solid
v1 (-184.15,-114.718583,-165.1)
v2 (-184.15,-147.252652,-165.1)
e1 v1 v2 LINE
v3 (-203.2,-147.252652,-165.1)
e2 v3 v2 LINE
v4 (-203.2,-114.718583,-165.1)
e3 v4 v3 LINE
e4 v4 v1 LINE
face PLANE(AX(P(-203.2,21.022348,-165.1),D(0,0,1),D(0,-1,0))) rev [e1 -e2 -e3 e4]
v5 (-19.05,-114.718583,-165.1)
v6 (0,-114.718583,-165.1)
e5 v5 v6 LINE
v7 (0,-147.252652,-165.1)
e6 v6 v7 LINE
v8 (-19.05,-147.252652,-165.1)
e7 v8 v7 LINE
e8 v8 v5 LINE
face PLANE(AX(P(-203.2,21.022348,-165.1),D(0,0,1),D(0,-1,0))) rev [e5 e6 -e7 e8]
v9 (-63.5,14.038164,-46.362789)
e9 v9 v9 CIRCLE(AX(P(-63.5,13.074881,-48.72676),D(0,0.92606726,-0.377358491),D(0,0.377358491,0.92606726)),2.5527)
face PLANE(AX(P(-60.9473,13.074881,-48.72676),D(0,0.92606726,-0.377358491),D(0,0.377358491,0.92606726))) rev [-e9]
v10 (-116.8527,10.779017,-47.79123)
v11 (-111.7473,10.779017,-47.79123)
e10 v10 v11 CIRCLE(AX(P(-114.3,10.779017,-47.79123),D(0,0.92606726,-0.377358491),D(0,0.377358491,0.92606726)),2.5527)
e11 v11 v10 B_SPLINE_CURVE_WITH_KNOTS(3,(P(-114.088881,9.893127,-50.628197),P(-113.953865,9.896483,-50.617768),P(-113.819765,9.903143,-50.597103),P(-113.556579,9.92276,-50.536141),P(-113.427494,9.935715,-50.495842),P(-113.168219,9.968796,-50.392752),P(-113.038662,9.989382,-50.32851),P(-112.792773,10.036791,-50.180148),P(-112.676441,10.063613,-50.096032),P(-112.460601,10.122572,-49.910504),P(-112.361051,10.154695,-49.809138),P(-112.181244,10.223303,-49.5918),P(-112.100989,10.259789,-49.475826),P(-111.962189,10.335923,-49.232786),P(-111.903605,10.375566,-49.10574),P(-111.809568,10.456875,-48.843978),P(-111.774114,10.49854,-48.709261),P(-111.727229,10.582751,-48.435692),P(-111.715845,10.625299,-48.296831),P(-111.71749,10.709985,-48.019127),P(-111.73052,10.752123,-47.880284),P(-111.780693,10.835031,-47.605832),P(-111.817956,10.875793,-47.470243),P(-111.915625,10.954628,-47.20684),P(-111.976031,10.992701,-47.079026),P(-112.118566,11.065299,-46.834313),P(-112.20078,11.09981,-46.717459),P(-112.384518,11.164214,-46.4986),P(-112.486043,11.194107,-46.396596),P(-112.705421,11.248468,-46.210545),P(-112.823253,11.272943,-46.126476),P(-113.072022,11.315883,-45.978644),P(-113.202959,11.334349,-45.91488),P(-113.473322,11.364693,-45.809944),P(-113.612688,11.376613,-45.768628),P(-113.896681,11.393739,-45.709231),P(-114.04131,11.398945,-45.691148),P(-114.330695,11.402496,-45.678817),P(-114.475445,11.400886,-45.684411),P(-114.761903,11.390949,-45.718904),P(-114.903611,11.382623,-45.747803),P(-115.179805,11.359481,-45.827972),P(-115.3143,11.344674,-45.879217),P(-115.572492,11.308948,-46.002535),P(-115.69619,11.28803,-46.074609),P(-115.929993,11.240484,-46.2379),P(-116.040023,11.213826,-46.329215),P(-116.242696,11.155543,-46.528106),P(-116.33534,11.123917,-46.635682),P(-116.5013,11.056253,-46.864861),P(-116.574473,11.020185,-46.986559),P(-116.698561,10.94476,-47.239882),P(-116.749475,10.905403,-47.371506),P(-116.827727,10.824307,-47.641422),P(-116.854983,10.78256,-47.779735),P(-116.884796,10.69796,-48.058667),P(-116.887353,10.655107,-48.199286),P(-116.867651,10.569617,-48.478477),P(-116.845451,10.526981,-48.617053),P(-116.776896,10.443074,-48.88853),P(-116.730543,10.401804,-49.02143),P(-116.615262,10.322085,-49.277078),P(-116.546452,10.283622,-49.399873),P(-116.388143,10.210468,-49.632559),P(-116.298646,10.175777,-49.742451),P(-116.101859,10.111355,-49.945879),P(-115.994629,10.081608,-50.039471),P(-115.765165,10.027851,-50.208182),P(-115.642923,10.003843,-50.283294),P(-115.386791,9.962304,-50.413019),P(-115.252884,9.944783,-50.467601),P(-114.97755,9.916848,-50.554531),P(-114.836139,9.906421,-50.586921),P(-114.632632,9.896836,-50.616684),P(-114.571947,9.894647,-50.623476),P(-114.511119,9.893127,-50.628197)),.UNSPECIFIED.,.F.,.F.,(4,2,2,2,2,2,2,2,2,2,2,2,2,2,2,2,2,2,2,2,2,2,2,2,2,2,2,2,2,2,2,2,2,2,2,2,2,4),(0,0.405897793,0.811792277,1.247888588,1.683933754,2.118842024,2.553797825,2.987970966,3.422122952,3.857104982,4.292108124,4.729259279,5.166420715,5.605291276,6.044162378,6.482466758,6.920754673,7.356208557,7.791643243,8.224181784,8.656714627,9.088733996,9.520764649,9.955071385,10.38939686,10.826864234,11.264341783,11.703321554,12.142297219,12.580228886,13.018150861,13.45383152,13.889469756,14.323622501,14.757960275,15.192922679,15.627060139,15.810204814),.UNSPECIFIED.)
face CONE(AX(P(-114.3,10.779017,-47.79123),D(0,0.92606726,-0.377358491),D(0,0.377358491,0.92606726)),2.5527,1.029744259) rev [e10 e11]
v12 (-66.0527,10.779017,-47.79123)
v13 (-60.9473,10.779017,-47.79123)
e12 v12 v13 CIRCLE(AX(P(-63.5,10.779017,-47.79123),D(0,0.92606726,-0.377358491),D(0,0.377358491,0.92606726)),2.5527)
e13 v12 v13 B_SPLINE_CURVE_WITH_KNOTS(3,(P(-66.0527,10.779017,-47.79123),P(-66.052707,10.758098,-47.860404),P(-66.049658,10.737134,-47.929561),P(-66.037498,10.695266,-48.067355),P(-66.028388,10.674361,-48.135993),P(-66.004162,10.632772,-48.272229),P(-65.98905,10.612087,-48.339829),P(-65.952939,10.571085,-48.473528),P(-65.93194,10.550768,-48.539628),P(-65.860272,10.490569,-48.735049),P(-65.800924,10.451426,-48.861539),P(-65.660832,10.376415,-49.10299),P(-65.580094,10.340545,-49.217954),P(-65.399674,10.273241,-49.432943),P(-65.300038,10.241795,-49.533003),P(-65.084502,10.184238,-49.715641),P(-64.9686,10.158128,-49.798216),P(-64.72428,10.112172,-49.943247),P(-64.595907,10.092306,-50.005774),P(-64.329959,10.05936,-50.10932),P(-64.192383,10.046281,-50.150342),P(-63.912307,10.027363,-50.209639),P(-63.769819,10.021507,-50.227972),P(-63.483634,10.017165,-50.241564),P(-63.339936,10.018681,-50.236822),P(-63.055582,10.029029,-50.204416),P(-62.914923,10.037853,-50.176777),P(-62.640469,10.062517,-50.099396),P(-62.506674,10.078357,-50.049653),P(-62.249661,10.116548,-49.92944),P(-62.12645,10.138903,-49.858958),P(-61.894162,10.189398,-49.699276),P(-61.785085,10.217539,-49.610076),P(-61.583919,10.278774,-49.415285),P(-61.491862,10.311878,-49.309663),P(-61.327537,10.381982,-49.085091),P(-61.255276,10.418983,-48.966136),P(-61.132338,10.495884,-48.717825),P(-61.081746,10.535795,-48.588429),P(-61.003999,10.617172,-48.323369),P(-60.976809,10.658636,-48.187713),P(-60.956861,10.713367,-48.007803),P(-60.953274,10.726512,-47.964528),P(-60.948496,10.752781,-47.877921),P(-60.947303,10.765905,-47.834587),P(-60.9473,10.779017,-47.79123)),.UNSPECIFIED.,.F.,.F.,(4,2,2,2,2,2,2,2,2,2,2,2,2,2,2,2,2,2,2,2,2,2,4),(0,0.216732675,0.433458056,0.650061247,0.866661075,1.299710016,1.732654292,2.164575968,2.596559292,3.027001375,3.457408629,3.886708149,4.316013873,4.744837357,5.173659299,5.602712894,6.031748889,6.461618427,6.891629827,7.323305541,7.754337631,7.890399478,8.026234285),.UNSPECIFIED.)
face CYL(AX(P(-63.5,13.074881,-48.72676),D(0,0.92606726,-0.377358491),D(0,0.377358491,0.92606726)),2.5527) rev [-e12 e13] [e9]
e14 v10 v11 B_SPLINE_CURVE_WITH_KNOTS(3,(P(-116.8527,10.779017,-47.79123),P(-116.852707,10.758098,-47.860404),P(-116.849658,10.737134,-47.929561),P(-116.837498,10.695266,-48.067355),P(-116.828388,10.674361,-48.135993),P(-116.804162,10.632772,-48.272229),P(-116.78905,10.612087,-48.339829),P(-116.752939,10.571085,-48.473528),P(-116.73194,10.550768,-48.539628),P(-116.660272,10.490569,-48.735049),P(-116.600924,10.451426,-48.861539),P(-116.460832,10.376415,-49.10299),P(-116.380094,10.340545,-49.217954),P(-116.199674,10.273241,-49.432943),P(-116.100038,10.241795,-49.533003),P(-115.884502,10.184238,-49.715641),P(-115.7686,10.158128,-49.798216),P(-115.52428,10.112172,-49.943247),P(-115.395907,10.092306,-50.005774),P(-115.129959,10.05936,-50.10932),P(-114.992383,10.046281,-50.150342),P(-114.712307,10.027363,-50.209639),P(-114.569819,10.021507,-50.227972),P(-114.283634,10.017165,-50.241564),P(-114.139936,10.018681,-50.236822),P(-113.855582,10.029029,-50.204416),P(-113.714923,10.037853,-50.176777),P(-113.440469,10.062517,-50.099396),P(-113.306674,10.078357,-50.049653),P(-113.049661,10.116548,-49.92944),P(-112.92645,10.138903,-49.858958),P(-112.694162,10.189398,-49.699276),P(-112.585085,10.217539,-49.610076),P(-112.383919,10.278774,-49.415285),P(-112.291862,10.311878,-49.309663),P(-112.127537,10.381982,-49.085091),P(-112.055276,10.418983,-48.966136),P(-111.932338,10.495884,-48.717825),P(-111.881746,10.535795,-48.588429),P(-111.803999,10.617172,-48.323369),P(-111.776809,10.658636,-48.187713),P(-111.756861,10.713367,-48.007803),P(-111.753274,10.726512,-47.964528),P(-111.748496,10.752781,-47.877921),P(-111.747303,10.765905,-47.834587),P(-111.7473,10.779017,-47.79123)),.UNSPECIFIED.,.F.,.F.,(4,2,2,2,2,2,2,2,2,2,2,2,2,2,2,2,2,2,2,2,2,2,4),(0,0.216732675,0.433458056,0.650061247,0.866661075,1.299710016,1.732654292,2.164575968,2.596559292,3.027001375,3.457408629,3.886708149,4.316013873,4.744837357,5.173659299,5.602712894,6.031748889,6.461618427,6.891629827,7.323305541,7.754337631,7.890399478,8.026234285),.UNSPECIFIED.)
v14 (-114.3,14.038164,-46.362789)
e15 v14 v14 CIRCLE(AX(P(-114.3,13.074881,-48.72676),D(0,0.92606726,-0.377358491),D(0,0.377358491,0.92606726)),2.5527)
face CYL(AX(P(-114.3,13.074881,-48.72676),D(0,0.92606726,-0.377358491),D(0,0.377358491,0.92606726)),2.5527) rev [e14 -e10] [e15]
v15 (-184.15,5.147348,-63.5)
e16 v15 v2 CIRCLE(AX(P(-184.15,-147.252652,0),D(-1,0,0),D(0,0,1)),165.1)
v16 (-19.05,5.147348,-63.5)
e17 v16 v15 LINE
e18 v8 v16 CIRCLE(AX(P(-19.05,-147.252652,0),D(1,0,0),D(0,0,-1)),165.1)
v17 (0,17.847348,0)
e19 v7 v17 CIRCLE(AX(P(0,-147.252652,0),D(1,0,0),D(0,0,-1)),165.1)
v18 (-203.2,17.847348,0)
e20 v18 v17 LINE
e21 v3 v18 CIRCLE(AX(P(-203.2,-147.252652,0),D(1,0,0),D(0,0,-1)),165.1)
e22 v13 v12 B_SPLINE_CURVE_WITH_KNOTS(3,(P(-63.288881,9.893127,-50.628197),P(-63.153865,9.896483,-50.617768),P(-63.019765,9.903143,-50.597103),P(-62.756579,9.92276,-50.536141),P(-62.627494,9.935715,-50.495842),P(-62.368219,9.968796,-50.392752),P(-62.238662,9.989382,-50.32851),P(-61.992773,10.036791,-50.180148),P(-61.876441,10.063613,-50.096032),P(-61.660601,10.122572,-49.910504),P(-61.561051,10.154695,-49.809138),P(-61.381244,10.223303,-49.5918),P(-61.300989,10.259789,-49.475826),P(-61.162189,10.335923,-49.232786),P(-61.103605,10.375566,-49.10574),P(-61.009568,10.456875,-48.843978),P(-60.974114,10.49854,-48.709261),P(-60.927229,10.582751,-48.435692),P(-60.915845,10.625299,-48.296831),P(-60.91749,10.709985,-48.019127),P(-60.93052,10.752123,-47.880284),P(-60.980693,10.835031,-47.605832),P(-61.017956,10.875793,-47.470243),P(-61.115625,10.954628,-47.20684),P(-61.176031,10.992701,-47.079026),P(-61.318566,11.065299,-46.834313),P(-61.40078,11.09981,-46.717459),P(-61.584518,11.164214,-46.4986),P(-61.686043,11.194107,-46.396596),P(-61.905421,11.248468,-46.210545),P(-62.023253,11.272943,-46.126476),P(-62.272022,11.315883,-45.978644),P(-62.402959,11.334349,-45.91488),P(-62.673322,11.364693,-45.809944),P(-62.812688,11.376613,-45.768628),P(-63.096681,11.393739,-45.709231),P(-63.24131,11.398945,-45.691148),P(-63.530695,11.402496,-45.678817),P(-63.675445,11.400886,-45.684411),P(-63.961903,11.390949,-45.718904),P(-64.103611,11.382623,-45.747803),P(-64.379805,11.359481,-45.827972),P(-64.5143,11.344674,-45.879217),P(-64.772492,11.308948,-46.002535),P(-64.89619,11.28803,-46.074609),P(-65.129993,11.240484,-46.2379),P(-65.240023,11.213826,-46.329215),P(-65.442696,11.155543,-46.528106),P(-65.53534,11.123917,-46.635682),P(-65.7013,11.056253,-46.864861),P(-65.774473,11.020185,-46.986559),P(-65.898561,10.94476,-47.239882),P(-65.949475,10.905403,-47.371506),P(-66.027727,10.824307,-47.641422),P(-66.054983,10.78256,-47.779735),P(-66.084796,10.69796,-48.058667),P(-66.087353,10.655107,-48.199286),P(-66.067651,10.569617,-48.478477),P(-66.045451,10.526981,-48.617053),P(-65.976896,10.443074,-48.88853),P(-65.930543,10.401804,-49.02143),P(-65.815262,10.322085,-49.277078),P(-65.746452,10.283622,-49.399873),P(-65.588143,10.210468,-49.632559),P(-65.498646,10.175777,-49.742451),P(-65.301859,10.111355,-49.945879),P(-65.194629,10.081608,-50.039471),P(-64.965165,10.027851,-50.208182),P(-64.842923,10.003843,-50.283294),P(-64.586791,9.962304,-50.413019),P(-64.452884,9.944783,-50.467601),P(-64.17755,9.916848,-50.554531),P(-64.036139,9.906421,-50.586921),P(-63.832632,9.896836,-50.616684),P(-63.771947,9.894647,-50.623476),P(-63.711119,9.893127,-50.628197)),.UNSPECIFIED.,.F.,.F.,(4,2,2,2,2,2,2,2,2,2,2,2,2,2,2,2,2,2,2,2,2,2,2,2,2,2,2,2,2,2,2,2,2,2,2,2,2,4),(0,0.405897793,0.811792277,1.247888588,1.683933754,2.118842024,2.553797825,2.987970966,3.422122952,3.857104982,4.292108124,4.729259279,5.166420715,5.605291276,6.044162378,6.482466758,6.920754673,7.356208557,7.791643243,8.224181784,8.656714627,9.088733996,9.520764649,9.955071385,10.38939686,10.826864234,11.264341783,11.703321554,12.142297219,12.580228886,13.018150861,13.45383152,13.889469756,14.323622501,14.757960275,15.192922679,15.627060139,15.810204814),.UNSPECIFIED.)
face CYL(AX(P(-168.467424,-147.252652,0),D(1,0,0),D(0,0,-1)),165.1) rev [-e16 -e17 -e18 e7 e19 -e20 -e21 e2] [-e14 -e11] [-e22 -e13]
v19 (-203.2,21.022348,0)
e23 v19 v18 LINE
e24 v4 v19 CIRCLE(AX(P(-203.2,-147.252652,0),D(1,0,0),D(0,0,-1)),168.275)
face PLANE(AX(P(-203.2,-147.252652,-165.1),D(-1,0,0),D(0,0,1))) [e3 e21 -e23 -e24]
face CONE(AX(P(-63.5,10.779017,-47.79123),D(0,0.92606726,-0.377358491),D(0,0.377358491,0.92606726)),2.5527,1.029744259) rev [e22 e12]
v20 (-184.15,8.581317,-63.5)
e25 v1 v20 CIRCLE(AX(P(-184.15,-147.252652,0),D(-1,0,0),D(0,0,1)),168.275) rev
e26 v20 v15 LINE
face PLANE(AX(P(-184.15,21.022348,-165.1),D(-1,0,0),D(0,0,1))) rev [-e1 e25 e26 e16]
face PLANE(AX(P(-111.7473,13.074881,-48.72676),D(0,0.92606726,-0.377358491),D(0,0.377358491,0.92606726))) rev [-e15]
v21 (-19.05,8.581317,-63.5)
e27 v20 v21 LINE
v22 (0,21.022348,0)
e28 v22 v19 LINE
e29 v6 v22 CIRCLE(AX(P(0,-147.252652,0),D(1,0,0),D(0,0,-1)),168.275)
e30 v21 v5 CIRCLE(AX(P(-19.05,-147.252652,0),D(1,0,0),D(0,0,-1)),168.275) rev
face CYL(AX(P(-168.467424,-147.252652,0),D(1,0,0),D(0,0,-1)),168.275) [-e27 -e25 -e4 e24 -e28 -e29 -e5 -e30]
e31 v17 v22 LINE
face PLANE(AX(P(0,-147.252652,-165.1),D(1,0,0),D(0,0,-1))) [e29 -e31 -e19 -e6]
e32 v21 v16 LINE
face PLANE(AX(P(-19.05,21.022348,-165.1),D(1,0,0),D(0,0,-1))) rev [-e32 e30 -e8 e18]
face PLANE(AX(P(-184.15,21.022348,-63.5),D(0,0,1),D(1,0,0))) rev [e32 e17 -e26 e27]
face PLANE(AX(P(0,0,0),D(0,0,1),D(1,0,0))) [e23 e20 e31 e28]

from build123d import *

# Parameters (mm, degrees)
SKETCH1_W          = 203.2
SKETCH1_H          = 3.175
REVOLVE1_ANGLE     = 90
SKETCH2_W          = 203.2
SKETCH2_H          = 3.175
CUT_EXTRUDE1_DEPTH = 313.926814527
SKETCH3_W          = 165.1
SKETCH3_H          = 101.6
CUT_EXTRUDE2_DEPTH = 312.230984359


# Read off the part's stored shape, not the designer's step: #10 Clearance Hole1
with BuildPart() as part:
    # Sketch1 → Revolve1 (revolve)
    with BuildSketch(Plane.XY):
        with Locations((-101.6, 19.434848485)):
            Rectangle(SKETCH1_W, SKETCH1_H)
    revolve(axis=Axis((-168.467424242, -147.252651515, 0), (-1, 0, 0)), revolution_arc=REVOLVE1_ANGLE)

    # Sketch2 → Cut-Extrude1 (cut, through all)
    with BuildSketch(Plane(origin=(0, -147.252651515, 0), x_dir=(-1, 0, 0), z_dir=(0, -1, 0))):
        with Locations((101.6, 166.6875)):
            Rectangle(SKETCH2_W, SKETCH2_H)
    extrude(amount=-CUT_EXTRUDE1_DEPTH, mode=Mode.SUBTRACT)

    # Sketch3 → Cut-Extrude2 (cut, through all)
    with BuildSketch(Plane.XZ.offset(147.252651515)):
        with Locations((-101.6, -114.3)):
            Rectangle(SKETCH3_W, SKETCH3_H)
    extrude(amount=-CUT_EXTRUDE2_DEPTH, mode=Mode.SUBTRACT)

    # #10 Clearance Hole1 outline → #10 Clearance Hole1 (revolve, cut)
    with BuildSketch(Plane(origin=(-63.5, -15.166166065, -37.2189581), x_dir=(1, 0, 0), z_dir=(0, 0.3773584905660381, 0.9260672597590962))):
        Polygon((2.5527, 30.49567621), (0, 30.49567621), (0, 27.797130409), (2.187572038, 27.797130409), (2.5527, 28.016521422), align=None)
    revolve(axis=Axis((-63.5, -15.166166065, -37.2189581), (0, 0.9260672597590962, -0.3773584905660381)), mode=Mode.SUBTRACT)

    # 10 Clearance Hole1 2 outline → 10 Clearance Hole1 2 (revolve, cut)
    with BuildSketch(Plane(origin=(-114.3, -15.166166065, -37.2189581), x_dir=(1, 0, 0), z_dir=(0, 0.3773584905660381, 0.9260672597590962))):
        Polygon((0, 30.49567621), (0, 27.797130409), (2.187572038, 27.797130409), (2.5527, 28.016521422), (2.5527, 30.49567621), align=None)
    revolve(axis=Axis((-114.3, -15.166166065, -37.2189581), (0, 0.9260672597590962, -0.3773584905660381)), mode=Mode.SUBTRACT)


solid = part.part
